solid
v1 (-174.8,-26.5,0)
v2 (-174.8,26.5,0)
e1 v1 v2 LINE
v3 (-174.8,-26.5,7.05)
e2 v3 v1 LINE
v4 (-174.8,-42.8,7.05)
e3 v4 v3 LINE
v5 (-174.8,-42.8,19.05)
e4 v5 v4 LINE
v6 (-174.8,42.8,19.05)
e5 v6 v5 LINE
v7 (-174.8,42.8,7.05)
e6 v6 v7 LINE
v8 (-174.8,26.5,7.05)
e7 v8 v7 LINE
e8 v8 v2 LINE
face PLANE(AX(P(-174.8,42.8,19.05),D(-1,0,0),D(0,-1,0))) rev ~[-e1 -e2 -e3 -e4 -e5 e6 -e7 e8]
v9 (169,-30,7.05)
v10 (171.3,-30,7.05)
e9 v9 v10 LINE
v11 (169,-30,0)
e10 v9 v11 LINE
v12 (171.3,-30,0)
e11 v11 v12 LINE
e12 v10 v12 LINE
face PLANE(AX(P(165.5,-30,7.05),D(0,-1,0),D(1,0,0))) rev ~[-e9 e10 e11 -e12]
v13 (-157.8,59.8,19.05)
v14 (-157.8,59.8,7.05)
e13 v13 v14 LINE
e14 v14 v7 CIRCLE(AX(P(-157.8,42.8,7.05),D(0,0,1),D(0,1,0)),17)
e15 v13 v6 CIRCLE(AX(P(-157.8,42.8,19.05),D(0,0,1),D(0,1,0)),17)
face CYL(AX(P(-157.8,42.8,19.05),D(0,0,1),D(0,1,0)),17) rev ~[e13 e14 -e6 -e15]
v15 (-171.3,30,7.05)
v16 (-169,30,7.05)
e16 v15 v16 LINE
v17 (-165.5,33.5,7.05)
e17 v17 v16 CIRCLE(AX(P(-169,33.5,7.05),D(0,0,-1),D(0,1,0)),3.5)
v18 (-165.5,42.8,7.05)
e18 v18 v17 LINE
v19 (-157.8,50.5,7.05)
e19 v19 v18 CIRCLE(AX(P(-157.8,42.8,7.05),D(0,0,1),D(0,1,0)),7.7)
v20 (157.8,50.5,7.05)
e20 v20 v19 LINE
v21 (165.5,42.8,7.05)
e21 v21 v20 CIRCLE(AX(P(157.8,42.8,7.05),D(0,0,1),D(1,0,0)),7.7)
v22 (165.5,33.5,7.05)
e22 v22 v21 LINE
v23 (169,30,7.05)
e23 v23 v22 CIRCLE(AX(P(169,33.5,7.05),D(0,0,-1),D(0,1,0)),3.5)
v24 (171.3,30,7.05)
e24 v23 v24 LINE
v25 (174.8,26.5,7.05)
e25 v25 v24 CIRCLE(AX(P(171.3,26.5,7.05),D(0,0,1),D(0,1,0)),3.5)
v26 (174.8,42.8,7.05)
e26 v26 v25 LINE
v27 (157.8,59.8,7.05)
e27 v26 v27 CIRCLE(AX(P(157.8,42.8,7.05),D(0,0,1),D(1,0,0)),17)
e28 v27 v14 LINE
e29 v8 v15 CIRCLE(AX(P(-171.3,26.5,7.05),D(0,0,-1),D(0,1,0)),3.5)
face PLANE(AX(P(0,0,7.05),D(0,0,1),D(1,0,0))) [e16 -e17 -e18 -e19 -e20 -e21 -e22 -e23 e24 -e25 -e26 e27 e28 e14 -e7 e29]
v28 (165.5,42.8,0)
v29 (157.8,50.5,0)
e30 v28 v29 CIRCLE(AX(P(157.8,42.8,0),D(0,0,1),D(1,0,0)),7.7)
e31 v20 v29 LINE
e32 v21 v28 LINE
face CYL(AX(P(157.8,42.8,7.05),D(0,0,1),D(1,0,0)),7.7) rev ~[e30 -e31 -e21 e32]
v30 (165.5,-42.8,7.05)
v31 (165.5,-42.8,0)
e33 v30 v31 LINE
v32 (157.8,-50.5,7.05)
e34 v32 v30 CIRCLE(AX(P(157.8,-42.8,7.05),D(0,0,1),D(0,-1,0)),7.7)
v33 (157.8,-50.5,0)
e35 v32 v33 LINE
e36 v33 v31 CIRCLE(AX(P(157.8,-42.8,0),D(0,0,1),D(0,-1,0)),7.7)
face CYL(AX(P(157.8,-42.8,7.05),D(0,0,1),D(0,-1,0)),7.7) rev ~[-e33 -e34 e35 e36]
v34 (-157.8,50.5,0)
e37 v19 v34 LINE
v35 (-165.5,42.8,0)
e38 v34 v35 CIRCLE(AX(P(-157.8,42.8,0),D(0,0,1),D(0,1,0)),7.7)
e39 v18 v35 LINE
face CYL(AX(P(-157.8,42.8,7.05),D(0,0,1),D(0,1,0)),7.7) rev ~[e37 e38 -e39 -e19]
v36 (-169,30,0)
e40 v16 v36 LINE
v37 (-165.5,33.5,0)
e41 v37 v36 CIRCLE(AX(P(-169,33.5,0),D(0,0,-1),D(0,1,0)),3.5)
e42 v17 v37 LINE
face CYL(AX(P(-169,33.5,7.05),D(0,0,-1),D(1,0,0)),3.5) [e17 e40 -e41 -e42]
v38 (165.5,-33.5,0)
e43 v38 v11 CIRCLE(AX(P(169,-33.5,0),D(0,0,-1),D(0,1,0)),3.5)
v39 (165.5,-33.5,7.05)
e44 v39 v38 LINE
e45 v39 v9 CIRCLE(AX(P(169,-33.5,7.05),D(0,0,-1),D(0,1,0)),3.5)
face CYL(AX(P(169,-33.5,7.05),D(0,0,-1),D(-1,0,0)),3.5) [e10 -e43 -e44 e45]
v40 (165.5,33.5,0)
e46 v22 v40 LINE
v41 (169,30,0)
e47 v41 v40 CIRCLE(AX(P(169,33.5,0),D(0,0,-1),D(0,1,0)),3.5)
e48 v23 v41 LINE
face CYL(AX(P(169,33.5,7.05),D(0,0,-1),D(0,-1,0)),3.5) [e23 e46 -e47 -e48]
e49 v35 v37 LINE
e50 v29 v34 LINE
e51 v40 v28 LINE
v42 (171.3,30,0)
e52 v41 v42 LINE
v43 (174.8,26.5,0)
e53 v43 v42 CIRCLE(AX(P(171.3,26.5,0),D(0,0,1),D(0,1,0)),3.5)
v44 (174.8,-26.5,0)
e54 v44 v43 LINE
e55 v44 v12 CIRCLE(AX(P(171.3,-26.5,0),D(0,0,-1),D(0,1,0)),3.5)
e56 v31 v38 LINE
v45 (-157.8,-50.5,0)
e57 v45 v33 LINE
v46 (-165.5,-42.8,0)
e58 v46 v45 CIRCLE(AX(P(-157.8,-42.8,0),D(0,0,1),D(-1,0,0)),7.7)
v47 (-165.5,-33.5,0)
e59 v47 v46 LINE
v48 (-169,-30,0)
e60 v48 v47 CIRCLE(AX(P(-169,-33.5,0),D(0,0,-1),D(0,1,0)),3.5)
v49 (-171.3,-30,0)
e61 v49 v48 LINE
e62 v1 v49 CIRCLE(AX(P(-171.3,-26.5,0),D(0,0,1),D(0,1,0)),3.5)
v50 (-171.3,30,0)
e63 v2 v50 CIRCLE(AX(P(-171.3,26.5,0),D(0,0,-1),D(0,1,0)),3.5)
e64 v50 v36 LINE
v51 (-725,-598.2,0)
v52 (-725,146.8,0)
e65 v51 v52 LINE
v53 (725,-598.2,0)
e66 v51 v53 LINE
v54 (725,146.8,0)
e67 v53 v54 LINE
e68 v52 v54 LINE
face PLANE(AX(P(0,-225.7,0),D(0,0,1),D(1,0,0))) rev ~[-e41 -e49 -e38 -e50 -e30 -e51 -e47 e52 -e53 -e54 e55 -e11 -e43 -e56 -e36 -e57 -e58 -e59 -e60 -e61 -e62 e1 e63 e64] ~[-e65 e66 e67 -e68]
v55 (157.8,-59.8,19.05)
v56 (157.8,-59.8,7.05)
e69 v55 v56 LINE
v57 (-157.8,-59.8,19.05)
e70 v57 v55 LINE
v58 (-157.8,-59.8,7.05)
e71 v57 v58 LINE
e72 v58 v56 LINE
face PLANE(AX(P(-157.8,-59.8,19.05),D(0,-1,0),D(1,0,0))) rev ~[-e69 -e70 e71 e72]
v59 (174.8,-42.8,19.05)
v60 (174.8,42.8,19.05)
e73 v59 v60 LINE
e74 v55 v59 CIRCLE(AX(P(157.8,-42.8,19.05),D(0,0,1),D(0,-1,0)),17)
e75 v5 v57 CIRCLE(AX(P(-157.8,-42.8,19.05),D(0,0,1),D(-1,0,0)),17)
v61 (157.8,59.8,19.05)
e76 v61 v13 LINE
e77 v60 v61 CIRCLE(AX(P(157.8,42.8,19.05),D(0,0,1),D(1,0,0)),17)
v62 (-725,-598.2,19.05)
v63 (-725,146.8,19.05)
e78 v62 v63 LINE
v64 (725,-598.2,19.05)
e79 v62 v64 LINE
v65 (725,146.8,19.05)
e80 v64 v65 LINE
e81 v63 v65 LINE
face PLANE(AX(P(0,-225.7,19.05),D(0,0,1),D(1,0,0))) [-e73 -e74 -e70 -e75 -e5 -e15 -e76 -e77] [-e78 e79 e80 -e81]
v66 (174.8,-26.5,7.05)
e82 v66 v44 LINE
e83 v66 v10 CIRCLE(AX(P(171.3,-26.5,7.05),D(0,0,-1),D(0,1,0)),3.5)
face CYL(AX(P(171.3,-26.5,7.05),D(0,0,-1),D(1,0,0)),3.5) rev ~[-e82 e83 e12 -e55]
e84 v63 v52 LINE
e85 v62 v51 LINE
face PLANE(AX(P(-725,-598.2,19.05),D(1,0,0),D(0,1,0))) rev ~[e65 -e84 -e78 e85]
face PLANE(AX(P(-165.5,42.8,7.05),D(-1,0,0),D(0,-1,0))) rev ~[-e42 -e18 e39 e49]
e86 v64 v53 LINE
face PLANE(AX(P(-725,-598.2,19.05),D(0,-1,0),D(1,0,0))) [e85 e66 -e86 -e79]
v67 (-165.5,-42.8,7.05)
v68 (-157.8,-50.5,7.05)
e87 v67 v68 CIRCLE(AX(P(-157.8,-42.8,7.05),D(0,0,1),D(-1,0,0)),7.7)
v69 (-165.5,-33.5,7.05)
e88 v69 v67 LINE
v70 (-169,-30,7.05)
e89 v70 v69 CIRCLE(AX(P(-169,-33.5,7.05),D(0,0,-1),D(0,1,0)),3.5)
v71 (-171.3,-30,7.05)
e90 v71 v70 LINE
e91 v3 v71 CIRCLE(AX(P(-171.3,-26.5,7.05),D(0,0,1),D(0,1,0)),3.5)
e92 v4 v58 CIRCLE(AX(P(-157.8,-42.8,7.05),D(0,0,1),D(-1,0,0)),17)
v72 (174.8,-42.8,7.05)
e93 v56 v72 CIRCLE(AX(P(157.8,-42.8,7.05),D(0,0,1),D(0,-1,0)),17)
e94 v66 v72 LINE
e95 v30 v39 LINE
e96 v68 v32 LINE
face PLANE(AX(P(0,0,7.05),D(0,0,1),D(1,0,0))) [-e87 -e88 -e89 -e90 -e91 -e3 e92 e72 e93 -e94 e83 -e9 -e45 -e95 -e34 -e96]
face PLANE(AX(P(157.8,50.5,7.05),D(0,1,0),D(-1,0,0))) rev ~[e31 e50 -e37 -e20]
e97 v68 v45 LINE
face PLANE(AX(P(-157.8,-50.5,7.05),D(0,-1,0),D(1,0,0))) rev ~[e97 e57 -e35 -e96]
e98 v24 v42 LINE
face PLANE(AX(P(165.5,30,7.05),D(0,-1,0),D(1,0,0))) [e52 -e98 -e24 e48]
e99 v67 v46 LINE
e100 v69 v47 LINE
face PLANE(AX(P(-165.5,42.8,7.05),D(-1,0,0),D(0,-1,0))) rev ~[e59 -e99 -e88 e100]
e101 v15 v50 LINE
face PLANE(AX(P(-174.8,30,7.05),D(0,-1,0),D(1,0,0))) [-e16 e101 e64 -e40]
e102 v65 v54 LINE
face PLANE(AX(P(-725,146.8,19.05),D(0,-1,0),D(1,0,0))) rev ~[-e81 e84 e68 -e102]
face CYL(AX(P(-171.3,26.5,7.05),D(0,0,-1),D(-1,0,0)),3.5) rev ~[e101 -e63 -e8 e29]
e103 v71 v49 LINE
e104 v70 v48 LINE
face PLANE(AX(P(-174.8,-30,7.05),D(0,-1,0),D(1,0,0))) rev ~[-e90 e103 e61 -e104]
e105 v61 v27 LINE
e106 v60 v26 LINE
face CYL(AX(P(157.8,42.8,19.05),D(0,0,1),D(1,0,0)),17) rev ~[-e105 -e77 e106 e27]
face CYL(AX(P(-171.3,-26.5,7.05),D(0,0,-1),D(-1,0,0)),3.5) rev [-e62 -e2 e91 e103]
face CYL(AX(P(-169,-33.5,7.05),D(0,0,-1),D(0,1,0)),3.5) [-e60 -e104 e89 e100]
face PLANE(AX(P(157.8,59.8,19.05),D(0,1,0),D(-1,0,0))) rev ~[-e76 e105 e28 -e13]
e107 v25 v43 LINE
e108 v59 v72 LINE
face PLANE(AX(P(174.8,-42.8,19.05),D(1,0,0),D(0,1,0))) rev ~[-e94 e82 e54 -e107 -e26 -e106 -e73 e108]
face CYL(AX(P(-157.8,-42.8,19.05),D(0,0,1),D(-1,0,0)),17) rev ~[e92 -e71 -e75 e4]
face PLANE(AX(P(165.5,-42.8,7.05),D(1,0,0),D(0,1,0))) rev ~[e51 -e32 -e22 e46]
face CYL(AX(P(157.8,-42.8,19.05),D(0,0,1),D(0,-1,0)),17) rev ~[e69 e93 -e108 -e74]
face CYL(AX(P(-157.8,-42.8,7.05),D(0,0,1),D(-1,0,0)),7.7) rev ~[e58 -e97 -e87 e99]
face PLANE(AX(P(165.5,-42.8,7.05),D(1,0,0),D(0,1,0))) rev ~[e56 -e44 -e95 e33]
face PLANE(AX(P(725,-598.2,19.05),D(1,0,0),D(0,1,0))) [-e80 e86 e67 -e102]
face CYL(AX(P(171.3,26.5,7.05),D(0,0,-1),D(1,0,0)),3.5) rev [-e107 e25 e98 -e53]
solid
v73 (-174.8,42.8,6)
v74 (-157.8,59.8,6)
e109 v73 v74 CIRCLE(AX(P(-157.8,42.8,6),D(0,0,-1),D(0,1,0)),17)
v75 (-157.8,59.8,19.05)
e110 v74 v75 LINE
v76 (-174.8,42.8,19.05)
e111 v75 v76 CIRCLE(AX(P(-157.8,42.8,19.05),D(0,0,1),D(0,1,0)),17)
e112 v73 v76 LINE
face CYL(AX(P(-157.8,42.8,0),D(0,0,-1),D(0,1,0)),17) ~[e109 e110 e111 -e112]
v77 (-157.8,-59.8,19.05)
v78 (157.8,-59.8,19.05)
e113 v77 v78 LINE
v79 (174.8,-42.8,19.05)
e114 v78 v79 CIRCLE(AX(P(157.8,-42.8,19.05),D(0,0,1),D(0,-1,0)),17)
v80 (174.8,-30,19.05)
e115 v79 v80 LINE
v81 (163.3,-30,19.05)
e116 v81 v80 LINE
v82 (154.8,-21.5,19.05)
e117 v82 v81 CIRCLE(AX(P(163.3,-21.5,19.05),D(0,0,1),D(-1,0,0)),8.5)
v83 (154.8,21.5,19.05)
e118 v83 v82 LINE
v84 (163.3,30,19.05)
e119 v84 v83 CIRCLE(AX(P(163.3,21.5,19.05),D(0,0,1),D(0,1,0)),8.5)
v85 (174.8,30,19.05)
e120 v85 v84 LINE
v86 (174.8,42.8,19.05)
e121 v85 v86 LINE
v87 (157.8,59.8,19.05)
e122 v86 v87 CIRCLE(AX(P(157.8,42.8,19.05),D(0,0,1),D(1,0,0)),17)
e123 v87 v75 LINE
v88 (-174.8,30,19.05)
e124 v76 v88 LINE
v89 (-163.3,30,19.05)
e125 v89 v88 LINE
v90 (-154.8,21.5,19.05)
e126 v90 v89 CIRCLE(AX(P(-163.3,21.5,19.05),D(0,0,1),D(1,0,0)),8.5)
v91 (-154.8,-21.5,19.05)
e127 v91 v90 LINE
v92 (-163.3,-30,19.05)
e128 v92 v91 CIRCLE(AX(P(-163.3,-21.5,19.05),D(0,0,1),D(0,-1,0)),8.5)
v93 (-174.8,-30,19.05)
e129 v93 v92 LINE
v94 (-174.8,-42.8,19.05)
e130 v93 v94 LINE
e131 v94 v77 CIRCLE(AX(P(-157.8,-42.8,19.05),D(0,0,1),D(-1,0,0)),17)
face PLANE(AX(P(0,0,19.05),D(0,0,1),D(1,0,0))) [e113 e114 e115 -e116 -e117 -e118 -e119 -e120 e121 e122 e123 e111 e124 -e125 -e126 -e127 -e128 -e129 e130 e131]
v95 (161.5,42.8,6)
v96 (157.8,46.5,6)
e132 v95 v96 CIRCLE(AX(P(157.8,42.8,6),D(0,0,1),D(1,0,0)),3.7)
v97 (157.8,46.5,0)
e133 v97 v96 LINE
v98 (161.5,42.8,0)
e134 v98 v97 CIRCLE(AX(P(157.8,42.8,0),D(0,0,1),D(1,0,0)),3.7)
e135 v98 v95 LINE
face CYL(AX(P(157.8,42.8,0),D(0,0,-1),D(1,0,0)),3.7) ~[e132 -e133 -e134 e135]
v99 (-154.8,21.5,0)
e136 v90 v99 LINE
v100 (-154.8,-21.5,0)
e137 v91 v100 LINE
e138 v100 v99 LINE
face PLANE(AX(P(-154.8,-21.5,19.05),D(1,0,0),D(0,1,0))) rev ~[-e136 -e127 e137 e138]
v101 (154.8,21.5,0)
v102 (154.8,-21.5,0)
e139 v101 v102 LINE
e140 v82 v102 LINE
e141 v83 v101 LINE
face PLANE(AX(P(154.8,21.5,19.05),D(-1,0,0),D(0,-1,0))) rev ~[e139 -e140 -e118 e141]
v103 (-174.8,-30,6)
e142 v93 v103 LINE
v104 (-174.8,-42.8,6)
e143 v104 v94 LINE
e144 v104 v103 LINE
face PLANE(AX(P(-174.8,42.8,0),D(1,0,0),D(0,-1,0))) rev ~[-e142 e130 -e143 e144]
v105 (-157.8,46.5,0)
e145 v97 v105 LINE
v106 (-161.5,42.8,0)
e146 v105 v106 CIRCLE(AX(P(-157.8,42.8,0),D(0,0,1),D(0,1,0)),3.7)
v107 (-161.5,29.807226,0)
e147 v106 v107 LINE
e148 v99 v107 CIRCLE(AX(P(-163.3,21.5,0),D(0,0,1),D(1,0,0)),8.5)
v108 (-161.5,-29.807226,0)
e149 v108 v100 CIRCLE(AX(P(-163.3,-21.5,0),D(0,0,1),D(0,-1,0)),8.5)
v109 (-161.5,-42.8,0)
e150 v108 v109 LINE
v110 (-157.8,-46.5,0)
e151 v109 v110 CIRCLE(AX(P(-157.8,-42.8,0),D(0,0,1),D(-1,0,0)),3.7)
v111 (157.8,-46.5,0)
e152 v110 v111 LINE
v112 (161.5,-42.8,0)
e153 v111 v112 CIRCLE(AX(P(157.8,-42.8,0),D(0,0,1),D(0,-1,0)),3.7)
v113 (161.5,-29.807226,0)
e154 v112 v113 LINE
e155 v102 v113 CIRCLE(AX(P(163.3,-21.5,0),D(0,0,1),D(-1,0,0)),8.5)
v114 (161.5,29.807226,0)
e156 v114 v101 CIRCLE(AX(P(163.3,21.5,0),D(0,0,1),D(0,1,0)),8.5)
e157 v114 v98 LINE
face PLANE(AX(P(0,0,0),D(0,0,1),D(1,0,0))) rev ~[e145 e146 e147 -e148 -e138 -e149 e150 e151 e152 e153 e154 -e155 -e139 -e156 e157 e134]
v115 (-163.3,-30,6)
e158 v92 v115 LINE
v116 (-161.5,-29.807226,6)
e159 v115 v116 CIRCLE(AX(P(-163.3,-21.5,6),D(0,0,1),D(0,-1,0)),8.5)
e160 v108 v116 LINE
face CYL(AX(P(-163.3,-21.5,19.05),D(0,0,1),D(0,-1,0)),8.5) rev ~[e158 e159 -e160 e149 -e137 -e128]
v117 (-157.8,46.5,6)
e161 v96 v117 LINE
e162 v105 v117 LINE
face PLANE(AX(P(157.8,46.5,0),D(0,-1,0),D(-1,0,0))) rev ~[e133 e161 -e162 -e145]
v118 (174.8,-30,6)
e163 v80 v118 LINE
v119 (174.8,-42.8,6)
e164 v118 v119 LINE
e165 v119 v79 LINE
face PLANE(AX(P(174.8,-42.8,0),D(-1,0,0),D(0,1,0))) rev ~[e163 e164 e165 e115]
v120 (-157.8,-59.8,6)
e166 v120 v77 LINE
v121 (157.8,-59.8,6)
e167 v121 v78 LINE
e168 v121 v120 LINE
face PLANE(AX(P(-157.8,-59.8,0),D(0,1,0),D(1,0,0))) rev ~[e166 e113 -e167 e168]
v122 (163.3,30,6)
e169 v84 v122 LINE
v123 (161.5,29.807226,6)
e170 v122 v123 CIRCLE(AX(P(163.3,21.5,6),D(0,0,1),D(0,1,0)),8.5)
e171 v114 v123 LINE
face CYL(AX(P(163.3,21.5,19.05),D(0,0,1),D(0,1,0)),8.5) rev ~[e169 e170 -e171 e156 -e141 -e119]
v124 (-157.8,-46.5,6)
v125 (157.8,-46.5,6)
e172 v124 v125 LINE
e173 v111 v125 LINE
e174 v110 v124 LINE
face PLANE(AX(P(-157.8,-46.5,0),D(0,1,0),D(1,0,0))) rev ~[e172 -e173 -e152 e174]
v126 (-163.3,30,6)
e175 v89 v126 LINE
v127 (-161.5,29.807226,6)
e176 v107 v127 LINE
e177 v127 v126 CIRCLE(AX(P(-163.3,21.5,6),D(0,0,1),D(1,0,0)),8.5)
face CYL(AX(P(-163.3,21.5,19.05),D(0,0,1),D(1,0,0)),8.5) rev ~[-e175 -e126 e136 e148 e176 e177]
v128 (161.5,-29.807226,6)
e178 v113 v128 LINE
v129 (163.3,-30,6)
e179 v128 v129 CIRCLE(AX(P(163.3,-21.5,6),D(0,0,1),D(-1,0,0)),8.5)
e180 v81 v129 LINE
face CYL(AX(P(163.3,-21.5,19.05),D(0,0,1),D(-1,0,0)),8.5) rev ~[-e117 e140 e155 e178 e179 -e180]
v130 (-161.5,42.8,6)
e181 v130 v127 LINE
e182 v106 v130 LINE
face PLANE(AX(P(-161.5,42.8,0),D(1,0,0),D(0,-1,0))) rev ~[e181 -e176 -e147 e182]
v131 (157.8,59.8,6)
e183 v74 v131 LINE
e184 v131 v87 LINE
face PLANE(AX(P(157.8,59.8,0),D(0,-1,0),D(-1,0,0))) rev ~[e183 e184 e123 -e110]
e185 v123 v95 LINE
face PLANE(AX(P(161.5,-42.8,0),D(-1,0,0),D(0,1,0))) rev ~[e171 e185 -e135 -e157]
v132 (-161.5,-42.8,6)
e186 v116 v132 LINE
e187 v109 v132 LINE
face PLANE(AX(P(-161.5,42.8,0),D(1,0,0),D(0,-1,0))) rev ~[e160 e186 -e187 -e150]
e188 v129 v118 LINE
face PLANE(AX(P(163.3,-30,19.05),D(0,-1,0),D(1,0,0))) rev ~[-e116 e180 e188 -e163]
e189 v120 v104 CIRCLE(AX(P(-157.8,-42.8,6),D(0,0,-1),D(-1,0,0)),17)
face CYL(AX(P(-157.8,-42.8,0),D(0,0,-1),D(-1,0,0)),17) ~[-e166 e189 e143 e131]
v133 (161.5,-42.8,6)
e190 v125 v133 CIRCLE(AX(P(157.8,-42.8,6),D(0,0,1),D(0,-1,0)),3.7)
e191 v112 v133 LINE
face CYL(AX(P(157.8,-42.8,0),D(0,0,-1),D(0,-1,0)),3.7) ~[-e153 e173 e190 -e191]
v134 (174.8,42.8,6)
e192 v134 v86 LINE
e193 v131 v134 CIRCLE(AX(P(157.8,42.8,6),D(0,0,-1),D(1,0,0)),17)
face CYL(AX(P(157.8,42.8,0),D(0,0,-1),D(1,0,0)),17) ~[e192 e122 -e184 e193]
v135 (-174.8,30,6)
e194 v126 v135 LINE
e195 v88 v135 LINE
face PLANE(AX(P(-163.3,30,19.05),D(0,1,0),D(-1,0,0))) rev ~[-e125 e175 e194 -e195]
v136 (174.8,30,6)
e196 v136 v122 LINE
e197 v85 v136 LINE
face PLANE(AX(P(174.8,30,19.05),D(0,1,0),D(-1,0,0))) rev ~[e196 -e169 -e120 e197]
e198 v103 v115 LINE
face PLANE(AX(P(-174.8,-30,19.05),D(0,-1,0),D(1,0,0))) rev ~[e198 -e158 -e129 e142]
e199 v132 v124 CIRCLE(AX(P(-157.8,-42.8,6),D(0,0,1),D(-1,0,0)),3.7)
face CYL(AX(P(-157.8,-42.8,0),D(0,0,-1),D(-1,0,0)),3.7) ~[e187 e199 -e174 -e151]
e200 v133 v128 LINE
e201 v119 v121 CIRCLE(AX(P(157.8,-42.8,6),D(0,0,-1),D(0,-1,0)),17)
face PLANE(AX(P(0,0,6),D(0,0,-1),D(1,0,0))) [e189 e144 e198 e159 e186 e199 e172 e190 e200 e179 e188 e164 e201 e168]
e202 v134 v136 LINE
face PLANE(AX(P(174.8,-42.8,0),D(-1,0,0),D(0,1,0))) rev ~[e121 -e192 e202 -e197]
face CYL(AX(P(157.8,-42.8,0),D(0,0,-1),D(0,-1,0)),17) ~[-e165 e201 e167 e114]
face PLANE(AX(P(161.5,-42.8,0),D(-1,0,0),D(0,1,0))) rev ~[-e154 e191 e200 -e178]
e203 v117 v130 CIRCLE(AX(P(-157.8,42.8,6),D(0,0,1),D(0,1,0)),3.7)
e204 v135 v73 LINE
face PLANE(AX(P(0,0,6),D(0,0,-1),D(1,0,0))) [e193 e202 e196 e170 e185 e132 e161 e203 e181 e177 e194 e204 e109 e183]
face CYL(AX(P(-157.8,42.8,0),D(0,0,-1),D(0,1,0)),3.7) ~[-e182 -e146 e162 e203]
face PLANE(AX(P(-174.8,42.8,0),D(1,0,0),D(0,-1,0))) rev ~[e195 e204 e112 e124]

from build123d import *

# Parameters (mm, degrees)
F1_DEPTH  = 19.05
F3_DEPTH  = 19.051
F4_W      = 406.4
F4_H      = 177.8
F5_DEPTH  = 6
F6_W      = 1450
F6_H      = 745
F7_DEPTH  = 19.05
F9_DEPTH  = 12
F11_DEPTH = 7.051
F12_W     = 9.3
F12_H     = 60
F13_DEPTH = 7.051
F14_R     = 3.5


with BuildPart() as f1:
    # F0 (on Top) → F1 (new body)
    with BuildSketch(Plane.XY):
        with BuildLine():
            ThreePointArc((-174.8, -42.8), (-169.8208152802, -54.8208152802), (-157.8, -59.8))
            Line((-157.8, -59.8), (157.8, -59.8))
            ThreePointArc((157.8, -59.8), (169.8208152802, -54.8208152802), (174.8, -42.8))
            Line((174.8, -42.8), (174.8, 42.8))
            ThreePointArc((174.8, 42.8), (169.8208152802, 54.8208152802), (157.8, 59.8))
            Line((157.8, 59.8), (-157.8, 59.8))
            ThreePointArc((-157.8, 59.8), (-169.8208152802, 54.8208152802), (-174.8, 42.8))
            Line((-174.8, 42.8), (-174.8, -42.8))
        make_face()
    extrude(amount=F1_DEPTH)

    # F2 (on face) → F3 (cut, through all)
    with BuildSketch(Plane.XY.offset(19.05)):
        with BuildLine():
            Line((-174.8, 30), (-174.8, -30))
            Line((-174.8, -30), (-163.3, -30))
            ThreePointArc((-163.3, -30), (-157.2895923599, -27.5104076401), (-154.8, -21.5))
            Line((-154.8, -21.5), (-154.8, 21.5))
            ThreePointArc((-154.8, 21.5), (-157.2895923599, 27.5104076401), (-163.3, 30))
            Line((-163.3, 30), (-174.8, 30))
        make_face()
        with BuildLine():
            Line((174.8, -30), (174.8, 30))
            Line((174.8, 30), (163.3, 30))
            ThreePointArc((163.3, 30), (157.2895923599, 27.5104076401), (154.8, 21.5))
            Line((154.8, 21.5), (154.8, -21.5))
            ThreePointArc((154.8, -21.5), (157.2895923599, -27.5104076401), (163.3, -30))
            Line((163.3, -30), (174.8, -30))
        make_face()
    extrude(amount=-F3_DEPTH, mode=Mode.SUBTRACT)

    # F4 (on face) → F5 (cut)
    with BuildSketch(Plane(origin=(0, 0, 0), x_dir=(1, 0, 0), z_dir=(0, 0, -1))):
        Rectangle(F4_W, F4_H)
        with BuildLine():
            ThreePointArc((161.5, -42.8), (160.4162950904, -45.4162950904), (157.8, -46.5))
            Line((157.8, -46.5), (-157.8, -46.5))
            ThreePointArc((-157.8, -46.5), (-160.4162950904, -45.4162950904), (-161.5, -42.8))
            Line((-161.5, -42.8), (-161.5, 42.8))
            ThreePointArc((-161.5, 42.8), (-160.4162950904, 45.4162950904), (-157.8, 46.5))
            Line((-157.8, 46.5), (157.8, 46.5))
            ThreePointArc((157.8, 46.5), (160.4162950904, 45.4162950904), (161.5, 42.8))
            Line((161.5, 42.8), (161.5, -42.8))
        make_face(mode=Mode.SUBTRACT)
    extrude(amount=-F5_DEPTH, mode=Mode.SUBTRACT)


with BuildPart() as f7:
    # F6 (on face) → F7 (new body)
    with BuildSketch(Plane.XY.offset(19.05)):
        with Locations((0, -225.7)):
            Rectangle(F6_W, F6_H)
    extrude(amount=-F7_DEPTH)

    # F8 (on face) → F9 (cut)
    with BuildSketch(Plane.XY.offset(19.05)):
        with BuildLine():
            Line((157.8, 59.8), (-157.8, 59.8))
            ThreePointArc((-157.8, 59.8), (-169.8208152802, 54.8208152802), (-174.8, 42.8))
            Line((-174.8, 42.8), (-174.8, 30))
            Line((-174.8, 30), (-174.8, -30))
            Line((-174.8, -30), (-174.8, -42.8))
            ThreePointArc((-174.8, -42.8), (-169.8208152802, -54.8208152802), (-157.8, -59.8))
            Line((-157.8, -59.8), (157.8, -59.8))
            ThreePointArc((157.8, -59.8), (169.8208152802, -54.8208152802), (174.8, -42.8))
            Line((174.8, -42.8), (174.8, -30))
            Line((174.8, -30), (174.8, 30))
            Line((174.8, 30), (174.8, 42.8))
            ThreePointArc((174.8, 42.8), (169.8208152802, 54.8208152802), (157.8, 59.8))
        make_face()
    extrude(amount=-F9_DEPTH, mode=Mode.SUBTRACT)

    # F10 (on face) → F11 (cut, through all)
    with BuildSketch(Plane.XY.offset(7.05)):
        with BuildLine():
            Line((-165.5, -30), (-165.5, -42.8))
            ThreePointArc((-165.5, -42.8), (-163.2447222151, -48.2447222151), (-157.8, -50.5))
            Line((-157.8, -50.5), (157.8, -50.5))
            ThreePointArc((157.8, -50.5), (163.2447222151, -48.2447222151), (165.5, -42.8))
            Line((165.5, -42.8), (165.5, -30))
            Line((165.5, -30), (165.5, 30))
            Line((165.5, 30), (165.5, 42.8))
            ThreePointArc((165.5, 42.8), (163.2447222151, 48.2447222151), (157.8, 50.5))
            Line((157.8, 50.5), (-157.8, 50.5))
            ThreePointArc((-157.8, 50.5), (-163.2447222151, 48.2447222151), (-165.5, 42.8))
            Line((-165.5, 42.8), (-165.5, 30))
            Line((-165.5, 30), (-165.5, -30))
        make_face()
    extrude(amount=-F11_DEPTH, mode=Mode.SUBTRACT)

    # F12 (on face) → F13 (cut, through all)
    with BuildSketch(Plane.XY.offset(7.05)):
        with Locations((-170.15, 0)):
            Rectangle(F12_W, F12_H)
        with Locations((170.15, 0)):
            Rectangle(F12_W, F12_H)
    extrude(amount=-F13_DEPTH, mode=Mode.SUBTRACT)

    # F14
    f14_edges = [f7.edges().sort_by_distance(p)[0] for p in [
        (-165.5, 30, 3.525),
        (-174.8, 30, 3.525),
        (-174.8, -30, 3.525),
        (-165.5, -30, 3.525),
        (165.5, 30, 3.525),
        (174.8, 30, 3.525),
        (165.5, -30, 3.525),
        (174.8, -30, 3.525),
    ]]
    fillet(f14_edges, radius=F14_R)


solid = Compound([f1.part, f7.part])
